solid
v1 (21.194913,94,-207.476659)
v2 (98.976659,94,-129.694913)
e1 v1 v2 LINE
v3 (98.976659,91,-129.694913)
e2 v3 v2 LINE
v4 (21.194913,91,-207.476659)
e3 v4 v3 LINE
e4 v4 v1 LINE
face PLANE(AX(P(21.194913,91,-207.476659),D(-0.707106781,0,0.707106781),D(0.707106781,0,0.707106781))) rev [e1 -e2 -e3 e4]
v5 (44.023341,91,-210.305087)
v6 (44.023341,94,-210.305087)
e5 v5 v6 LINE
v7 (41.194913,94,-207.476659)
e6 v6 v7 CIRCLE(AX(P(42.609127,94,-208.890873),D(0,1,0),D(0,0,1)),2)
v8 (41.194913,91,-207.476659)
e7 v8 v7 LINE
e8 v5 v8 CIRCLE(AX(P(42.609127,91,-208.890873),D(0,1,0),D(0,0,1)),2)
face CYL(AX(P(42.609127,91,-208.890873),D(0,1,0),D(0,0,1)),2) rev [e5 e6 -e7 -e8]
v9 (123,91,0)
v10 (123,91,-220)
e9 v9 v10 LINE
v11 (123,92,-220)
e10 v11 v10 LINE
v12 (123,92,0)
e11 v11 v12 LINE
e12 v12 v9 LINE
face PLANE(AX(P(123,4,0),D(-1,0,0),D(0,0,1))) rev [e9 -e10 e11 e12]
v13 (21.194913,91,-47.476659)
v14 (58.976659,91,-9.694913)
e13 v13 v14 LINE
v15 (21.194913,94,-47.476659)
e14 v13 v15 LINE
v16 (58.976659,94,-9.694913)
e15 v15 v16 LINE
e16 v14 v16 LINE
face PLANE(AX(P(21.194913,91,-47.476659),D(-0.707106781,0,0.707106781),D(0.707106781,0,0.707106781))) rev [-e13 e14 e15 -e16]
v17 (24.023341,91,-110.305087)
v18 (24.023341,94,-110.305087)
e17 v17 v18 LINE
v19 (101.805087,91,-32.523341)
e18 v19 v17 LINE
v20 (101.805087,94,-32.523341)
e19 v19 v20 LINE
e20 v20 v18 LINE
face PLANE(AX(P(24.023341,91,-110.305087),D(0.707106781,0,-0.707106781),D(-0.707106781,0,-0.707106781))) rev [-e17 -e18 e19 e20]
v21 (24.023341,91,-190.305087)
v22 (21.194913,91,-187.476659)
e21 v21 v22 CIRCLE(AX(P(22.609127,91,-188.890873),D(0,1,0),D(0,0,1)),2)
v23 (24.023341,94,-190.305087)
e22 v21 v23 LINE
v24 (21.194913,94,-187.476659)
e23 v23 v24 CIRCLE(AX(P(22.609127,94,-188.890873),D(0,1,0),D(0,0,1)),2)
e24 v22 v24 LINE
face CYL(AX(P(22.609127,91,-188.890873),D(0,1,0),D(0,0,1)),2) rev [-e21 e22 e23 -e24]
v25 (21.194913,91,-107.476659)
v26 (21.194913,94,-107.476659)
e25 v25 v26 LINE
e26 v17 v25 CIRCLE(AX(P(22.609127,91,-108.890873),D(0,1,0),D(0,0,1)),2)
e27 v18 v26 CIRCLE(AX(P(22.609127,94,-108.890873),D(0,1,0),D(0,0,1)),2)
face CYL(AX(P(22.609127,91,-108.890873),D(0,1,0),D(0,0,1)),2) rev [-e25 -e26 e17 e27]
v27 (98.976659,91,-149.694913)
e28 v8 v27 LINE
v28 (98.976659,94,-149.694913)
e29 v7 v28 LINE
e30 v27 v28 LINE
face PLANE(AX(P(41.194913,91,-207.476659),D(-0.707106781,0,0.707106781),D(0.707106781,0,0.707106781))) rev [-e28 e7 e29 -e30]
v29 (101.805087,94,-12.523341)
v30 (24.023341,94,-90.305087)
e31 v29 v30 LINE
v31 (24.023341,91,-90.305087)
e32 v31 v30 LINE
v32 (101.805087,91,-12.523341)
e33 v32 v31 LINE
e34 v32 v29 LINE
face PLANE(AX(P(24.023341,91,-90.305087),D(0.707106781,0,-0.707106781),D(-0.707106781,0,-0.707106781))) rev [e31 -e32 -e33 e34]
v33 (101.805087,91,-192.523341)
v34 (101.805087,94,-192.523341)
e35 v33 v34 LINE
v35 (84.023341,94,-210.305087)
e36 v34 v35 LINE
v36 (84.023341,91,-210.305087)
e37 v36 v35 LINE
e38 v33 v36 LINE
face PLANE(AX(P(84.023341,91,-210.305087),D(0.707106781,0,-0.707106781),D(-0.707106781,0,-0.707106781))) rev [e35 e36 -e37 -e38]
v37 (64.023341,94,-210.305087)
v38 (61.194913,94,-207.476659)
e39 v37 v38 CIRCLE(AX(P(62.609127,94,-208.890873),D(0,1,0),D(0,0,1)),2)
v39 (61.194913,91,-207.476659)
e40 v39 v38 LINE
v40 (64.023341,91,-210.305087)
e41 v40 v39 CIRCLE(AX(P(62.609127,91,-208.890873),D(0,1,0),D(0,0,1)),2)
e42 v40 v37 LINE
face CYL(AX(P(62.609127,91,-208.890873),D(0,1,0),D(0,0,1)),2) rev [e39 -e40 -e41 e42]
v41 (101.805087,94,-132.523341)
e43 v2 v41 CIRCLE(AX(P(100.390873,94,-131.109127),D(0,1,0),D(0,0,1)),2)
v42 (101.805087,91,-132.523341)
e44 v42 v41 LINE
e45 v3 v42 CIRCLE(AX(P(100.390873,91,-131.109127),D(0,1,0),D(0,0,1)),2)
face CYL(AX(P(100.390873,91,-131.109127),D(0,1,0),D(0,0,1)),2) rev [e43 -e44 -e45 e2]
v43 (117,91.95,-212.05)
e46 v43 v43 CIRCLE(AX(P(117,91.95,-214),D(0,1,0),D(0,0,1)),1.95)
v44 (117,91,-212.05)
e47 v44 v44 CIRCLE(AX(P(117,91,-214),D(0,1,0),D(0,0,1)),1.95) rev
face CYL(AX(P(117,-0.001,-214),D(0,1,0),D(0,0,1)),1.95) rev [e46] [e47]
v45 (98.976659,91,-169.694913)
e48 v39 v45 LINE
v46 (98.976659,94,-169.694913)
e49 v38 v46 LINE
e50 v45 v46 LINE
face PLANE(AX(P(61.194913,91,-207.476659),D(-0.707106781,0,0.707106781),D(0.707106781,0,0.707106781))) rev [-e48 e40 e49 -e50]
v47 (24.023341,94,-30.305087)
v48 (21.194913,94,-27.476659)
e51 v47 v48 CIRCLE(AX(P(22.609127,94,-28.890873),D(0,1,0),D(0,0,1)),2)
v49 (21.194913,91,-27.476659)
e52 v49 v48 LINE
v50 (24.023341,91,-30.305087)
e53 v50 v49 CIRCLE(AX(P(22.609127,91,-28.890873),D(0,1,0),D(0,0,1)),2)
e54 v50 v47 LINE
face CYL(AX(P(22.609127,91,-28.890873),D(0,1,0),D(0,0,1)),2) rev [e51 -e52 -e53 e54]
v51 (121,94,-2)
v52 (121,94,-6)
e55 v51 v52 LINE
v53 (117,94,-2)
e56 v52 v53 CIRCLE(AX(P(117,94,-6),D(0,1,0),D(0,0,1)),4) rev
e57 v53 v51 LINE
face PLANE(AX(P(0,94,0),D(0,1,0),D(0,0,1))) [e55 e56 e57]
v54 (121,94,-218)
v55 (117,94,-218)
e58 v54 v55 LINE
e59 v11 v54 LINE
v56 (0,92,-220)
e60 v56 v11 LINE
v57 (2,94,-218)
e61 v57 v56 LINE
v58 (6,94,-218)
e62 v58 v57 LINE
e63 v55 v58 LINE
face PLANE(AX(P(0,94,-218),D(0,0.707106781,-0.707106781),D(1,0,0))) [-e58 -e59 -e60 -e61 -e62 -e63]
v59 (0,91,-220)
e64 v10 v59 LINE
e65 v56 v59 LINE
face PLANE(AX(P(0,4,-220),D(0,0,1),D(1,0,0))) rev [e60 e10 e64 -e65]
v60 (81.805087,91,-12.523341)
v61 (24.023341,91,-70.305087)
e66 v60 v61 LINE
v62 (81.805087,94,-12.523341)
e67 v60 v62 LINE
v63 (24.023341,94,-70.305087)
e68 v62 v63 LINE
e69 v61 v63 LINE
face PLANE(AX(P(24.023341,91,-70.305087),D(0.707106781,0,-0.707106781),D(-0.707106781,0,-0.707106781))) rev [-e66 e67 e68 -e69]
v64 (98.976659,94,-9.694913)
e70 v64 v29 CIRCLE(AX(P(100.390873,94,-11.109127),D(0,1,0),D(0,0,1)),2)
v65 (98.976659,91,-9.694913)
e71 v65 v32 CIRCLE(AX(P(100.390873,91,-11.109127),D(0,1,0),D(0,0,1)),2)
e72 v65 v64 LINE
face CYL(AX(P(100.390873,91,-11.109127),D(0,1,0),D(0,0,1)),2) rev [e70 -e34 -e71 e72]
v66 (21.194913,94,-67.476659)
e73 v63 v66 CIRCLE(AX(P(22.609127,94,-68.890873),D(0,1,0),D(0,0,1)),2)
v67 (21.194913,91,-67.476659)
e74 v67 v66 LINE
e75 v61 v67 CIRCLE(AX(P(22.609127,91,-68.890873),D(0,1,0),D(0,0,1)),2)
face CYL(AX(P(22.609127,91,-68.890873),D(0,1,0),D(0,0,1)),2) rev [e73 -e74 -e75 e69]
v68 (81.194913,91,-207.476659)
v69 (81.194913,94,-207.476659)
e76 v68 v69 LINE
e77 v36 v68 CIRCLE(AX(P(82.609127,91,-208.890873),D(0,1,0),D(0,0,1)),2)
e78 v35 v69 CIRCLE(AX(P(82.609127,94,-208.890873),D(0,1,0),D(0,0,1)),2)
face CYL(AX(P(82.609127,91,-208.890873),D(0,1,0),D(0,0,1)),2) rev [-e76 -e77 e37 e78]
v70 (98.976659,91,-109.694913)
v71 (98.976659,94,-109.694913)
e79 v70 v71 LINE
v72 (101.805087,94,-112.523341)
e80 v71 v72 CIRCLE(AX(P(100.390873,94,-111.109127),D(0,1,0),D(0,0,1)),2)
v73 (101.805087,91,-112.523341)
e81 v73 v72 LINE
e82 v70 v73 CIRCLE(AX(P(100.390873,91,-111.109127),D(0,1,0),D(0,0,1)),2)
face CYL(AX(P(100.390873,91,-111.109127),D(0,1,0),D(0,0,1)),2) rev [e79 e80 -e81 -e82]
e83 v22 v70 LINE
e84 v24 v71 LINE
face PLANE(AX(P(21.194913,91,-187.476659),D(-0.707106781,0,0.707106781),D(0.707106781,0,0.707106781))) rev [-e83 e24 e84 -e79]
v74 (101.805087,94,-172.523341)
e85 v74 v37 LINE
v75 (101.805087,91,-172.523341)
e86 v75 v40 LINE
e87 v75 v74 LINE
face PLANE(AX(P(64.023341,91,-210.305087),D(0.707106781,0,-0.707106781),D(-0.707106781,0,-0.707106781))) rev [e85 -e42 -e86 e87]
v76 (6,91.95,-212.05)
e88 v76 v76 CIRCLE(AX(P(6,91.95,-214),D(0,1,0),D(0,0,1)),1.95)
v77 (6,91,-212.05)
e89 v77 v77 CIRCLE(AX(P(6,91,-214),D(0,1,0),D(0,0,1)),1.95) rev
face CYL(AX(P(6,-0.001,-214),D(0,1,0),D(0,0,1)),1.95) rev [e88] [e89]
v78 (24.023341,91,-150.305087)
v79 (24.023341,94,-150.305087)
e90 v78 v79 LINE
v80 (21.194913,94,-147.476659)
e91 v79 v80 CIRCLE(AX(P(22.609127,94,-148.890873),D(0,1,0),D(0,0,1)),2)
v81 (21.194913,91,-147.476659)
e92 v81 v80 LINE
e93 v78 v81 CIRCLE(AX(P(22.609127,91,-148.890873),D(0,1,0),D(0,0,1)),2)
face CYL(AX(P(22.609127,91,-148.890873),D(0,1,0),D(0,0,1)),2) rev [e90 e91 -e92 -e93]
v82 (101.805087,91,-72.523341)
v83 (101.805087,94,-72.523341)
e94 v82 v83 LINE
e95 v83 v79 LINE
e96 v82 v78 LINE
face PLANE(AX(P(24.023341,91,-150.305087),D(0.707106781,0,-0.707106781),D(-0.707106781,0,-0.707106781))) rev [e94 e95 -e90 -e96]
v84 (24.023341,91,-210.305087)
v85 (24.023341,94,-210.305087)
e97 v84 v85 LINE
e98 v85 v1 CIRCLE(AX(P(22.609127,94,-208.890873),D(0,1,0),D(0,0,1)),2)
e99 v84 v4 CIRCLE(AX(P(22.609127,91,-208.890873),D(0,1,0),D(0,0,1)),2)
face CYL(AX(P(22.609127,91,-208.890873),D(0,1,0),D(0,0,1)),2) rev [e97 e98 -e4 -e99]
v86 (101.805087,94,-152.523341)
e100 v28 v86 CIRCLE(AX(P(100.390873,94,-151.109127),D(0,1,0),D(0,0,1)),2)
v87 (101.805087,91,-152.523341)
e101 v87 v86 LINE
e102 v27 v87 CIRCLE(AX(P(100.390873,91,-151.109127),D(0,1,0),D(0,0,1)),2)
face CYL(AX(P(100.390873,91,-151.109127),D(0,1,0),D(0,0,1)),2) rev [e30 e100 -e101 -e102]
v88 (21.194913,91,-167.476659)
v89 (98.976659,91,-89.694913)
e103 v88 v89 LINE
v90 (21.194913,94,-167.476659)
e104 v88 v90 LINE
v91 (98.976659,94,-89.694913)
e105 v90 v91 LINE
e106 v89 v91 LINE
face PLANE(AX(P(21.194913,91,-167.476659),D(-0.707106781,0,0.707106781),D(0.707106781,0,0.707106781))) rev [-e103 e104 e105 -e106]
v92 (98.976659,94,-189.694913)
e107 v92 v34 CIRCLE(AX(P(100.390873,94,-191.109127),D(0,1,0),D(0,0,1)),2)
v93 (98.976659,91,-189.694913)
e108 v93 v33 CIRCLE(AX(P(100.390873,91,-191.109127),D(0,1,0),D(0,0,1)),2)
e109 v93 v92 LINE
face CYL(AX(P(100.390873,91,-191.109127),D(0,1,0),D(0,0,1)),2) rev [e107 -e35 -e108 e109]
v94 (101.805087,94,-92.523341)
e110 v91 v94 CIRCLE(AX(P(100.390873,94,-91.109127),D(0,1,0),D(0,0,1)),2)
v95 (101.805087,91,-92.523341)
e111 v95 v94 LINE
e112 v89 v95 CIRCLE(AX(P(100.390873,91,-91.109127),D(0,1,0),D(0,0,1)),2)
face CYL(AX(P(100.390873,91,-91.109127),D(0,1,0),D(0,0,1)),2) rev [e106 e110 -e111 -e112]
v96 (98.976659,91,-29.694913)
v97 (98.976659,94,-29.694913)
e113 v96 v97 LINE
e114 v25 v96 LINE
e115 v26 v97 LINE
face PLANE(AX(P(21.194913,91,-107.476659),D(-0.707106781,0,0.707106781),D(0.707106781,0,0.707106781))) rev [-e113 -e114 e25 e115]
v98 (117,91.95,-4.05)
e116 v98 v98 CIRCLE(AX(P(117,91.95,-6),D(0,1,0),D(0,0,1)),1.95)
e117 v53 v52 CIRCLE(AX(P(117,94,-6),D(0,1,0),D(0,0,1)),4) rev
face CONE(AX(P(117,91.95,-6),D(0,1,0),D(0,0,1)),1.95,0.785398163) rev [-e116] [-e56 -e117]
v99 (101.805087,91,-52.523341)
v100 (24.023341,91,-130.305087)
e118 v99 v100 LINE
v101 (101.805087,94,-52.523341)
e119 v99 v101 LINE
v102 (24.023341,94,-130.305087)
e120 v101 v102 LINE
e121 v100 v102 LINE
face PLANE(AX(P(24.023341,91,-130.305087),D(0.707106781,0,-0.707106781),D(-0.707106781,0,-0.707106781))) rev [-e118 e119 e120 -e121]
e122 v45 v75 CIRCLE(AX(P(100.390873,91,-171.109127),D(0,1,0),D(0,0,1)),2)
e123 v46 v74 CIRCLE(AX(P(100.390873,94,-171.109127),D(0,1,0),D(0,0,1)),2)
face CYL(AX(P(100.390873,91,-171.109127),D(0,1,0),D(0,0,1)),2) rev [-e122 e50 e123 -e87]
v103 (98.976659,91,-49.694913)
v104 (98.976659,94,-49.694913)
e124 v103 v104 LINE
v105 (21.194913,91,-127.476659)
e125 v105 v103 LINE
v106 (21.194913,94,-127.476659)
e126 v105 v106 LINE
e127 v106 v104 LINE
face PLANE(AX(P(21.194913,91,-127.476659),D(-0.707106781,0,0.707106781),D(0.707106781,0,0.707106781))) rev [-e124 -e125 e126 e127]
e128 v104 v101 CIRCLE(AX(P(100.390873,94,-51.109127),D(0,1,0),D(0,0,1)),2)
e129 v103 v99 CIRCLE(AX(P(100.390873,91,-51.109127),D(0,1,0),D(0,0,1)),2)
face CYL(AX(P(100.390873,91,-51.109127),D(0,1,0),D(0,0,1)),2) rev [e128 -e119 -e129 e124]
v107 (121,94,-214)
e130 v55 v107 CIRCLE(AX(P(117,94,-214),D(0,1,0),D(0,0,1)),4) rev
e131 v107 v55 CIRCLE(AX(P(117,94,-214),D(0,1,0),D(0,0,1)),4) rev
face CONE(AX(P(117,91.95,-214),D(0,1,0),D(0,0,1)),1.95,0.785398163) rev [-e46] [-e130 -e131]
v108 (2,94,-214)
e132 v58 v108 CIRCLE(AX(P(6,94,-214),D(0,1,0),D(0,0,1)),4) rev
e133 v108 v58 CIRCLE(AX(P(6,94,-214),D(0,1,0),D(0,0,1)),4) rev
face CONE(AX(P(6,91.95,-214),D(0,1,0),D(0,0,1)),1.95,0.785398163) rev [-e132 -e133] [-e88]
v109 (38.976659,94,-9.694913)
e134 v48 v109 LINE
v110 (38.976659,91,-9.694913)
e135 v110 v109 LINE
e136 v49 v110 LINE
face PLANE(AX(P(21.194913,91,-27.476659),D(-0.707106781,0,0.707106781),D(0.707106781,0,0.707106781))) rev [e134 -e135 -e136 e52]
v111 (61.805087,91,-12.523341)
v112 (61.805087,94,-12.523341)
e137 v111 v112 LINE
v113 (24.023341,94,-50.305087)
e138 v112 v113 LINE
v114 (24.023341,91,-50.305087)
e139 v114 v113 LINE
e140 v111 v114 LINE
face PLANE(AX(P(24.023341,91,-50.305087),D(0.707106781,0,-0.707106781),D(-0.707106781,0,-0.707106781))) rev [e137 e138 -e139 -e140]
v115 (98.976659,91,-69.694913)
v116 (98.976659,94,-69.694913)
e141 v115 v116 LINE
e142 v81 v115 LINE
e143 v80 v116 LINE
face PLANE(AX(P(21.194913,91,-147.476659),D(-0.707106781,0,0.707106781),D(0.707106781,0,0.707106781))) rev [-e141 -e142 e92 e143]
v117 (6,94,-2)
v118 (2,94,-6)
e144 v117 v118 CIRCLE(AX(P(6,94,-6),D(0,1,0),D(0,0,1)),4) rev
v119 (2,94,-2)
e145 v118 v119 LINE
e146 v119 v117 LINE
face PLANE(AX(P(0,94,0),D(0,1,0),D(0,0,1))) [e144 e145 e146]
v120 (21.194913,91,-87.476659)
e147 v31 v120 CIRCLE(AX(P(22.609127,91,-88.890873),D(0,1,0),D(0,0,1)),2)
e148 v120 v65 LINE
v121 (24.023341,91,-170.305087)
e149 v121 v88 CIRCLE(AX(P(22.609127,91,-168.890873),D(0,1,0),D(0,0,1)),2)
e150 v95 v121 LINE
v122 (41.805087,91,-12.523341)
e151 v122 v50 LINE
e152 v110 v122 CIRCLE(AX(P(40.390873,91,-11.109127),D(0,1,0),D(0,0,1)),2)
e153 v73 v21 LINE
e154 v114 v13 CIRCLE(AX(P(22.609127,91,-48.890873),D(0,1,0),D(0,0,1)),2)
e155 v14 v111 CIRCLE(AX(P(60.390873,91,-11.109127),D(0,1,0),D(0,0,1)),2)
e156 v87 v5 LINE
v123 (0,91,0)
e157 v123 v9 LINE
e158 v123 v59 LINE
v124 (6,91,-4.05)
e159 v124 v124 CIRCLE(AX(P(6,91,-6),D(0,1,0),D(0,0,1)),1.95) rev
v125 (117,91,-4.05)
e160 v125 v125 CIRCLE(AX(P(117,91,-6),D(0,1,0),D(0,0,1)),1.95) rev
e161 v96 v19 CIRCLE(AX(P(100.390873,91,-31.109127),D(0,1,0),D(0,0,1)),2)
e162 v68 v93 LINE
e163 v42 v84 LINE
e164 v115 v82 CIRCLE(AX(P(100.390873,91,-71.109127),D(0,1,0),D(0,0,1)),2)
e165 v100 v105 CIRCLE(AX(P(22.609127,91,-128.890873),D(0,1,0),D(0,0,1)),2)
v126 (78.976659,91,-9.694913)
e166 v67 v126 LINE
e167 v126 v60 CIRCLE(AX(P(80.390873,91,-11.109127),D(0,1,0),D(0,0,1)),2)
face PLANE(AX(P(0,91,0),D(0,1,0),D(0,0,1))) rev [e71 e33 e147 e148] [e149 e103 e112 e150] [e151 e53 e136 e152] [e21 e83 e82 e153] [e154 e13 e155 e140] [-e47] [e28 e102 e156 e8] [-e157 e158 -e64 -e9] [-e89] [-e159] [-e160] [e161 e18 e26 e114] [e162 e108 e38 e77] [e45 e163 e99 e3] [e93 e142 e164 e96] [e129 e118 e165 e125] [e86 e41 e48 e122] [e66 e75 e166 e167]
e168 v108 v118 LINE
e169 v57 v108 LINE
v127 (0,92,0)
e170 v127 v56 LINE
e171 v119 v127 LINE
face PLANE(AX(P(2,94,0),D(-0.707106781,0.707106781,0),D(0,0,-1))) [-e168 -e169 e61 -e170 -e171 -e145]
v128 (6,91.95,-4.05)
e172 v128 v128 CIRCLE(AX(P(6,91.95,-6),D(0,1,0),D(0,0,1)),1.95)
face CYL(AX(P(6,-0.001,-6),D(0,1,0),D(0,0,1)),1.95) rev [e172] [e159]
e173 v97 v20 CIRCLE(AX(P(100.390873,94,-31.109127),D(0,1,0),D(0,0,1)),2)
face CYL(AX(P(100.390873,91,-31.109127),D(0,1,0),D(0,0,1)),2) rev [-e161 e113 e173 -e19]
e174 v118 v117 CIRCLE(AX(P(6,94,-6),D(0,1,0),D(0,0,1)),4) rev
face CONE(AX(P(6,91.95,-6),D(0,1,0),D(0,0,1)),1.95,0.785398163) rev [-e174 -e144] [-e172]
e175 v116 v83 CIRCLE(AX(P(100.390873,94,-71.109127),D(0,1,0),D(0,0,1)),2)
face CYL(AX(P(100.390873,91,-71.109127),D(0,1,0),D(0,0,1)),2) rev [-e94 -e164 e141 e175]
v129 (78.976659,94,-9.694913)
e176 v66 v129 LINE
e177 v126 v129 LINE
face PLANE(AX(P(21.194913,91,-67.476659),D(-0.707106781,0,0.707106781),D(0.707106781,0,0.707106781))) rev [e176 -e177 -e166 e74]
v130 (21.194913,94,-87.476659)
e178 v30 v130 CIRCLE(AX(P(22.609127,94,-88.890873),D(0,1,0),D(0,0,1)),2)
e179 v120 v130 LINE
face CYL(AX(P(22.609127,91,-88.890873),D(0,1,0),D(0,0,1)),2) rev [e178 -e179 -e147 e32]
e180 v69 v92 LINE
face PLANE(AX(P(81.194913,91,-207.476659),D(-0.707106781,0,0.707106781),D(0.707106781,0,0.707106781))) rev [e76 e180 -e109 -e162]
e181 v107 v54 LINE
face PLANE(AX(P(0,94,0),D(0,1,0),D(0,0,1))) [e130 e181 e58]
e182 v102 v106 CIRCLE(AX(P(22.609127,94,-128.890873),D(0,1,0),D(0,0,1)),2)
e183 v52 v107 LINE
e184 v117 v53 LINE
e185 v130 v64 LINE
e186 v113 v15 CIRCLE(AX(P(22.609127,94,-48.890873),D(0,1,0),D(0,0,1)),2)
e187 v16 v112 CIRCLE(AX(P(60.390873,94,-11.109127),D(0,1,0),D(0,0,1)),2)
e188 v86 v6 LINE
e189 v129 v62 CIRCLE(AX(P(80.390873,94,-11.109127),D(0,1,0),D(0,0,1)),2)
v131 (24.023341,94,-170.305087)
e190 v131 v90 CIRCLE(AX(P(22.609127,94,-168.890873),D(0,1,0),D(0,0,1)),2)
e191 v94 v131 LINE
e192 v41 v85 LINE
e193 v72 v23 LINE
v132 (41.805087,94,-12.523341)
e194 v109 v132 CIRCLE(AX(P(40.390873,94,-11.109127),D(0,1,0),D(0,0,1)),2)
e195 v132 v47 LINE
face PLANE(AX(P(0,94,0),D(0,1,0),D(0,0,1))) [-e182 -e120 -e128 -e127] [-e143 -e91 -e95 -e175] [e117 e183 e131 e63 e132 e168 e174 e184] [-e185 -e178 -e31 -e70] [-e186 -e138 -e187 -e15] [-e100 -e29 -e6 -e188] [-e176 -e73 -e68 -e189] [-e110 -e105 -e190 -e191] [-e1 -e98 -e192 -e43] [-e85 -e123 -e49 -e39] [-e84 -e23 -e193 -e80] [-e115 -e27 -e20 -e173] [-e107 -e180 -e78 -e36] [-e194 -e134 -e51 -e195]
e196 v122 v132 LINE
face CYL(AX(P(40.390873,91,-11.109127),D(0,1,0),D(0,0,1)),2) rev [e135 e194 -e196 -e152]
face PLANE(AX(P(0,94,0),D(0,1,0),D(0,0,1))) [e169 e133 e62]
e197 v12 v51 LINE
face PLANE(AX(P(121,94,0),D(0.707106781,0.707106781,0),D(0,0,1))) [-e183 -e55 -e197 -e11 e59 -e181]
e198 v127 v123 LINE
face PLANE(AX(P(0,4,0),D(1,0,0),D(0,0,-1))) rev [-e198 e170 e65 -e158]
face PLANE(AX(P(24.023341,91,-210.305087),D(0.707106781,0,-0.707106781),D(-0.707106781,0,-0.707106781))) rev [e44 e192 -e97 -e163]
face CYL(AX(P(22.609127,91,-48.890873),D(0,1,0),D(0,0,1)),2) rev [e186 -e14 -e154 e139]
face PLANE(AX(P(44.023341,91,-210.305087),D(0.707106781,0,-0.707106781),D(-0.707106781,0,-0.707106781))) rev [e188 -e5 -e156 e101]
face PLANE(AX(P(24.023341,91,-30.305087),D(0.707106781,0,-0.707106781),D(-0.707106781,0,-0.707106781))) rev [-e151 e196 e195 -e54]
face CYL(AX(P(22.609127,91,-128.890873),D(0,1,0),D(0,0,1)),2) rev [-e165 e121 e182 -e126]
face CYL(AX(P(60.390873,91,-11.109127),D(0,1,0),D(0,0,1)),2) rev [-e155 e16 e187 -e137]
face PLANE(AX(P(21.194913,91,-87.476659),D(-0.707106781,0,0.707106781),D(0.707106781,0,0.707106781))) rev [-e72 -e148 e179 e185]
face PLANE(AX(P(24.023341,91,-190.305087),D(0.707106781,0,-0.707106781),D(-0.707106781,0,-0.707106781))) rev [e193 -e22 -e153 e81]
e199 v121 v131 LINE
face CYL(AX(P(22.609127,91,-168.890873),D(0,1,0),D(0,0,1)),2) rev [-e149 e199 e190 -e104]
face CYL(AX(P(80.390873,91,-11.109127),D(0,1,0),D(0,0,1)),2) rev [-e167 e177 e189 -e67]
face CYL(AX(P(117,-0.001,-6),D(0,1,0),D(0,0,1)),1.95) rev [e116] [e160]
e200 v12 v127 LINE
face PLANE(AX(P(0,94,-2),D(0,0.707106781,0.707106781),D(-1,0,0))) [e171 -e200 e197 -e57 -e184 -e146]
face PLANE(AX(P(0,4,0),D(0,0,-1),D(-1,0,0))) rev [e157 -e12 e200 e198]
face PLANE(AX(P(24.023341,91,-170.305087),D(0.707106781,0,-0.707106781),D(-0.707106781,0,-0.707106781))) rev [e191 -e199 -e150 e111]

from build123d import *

# Parameters (mm, degrees)
SKETCH1_W           = 123
SKETCH1_H           = 220
BOSS_EXTRUDE1_DEPTH = 4
SKETCH2_W           = 123
SKETCH2_H           = 220
SKETCH2_W_2         = 115
SKETCH2_H_2         = 212
BOSS_EXTRUDE2_DEPTH = 87
CUT_EXTRUDE1_REACH  = 269.974
SKETCH3_W           = 115
SKETCH3_H           = 45
CUT_EXTRUDE2_REACH  = 269.974
SKETCH4_W           = 150
SKETCH4_H           = 20
SKETCH6_W           = 24
SKETCH6_H           = 37
SKETCH6_R           = 1.45
BOSS_EXTRUDE4_DEPTH = 3
SKETCH8_W           = 12
SKETCH8_H           = 12
BOSS_EXTRUDE5_DEPTH = 10
CUT_EXTRUDE3_REACH  = 269.974
SKETCH9_R           = 1.95
CUT_EXTRUDE4_REACH  = 269.974
SKETCH10_W          = 99
SKETCH10_H          = 40
CHAMFER1_SIZE       = 10
BOSS_EXTRUDE6_START = 3
SKETCH11_W          = 123
SKETCH11_H          = 220
SKETCH11_R          = 1.95
BOSS_EXTRUDE6_DEPTH = 3
CHAMFER2_SIZE       = 2.05
SKETCH12_W          = 123
SKETCH12_H          = 91
CUT_EXTRUDE5_DEPTH  = 270.007434841
CHAMFER3_SIZE       = 2
CUT_EXTRUDE6_DEPTH  = 253.06745129


with BuildPart() as part:
    # Sketch1 → Boss-Extrude1 (new body)
    with BuildSketch(Plane(origin=(0, 0, 0), x_dir=(1, 0, 0), z_dir=(0, 1, 0))):
        with Locations((61.5, 110)):
            Rectangle(SKETCH1_W, SKETCH1_H)
    extrude(amount=BOSS_EXTRUDE1_DEPTH)

    # Sketch2 → Boss-Extrude2 (add)
    with BuildSketch(Plane(origin=(0, 4, 0), x_dir=(1, 0, 0), z_dir=(0, 1, 0))):
        with Locations((61.5, 110)):
            Rectangle(SKETCH2_W, SKETCH2_H)
        with Locations((61.5, 110)):
            Rectangle(SKETCH2_W_2, SKETCH2_H_2, mode=Mode.SUBTRACT)
    extrude(amount=BOSS_EXTRUDE2_DEPTH)

    # Sketch3 → Cut-Extrude1 (cut, up to next)
    with BuildSketch(Plane.XY, mode=Mode.PRIVATE) as cut_extrude1_sk1:
        with Locations((61.5, 26.5)):
            Rectangle(SKETCH3_W, SKETCH3_H)
    cut_extrude1_tool1 = extrude(cut_extrude1_sk1.sketch, amount=-CUT_EXTRUDE1_REACH, mode=Mode.PRIVATE) & part.part
    add(cut_extrude1_tool1.solids().sort_by_distance((61.5, 26.5, 0))[0], mode=Mode.SUBTRACT)

    # Sketch4 → Cut-Extrude2 (cut, up to next)
    with BuildSketch(Plane(origin=(123, 0, 0), x_dir=(0, 0, -1), z_dir=(1, 0, 0)), mode=Mode.PRIVATE) as cut_extrude2_sk1:
        with Locations((125, 81)):
            Rectangle(SKETCH4_W, SKETCH4_H)
    cut_extrude2_tool1 = extrude(cut_extrude2_sk1.sketch, amount=-CUT_EXTRUDE2_REACH, mode=Mode.PRIVATE) & part.part
    add(cut_extrude2_tool1.solids().sort_by_distance((123, 81, -125))[0], mode=Mode.SUBTRACT)

    # Sketch6 → Boss-Extrude4 (add)
    # profile 1 of 2: a face of its own
    with BuildSketch(Plane(origin=(0, 49, 0), x_dir=(-1, 0, 0), z_dir=(0, -1, 0))):
        with Locations((-16, 22.5)):
            Rectangle(SKETCH6_W, SKETCH6_H)
        with Locations(Location((-25, 27.5, 0), (0, 0, 90))):
            Circle(SKETCH6_R, mode=Mode.SUBTRACT)
        with Locations(Location((-25, 17.5, 0), (0, 0, 270))):
            Circle(SKETCH6_R, mode=Mode.SUBTRACT)
    # profile 2 of 2: a face of its own
    with BuildSketch(Plane(origin=(0, 49, 0), x_dir=(-1, 0, 0), z_dir=(0, -1, 0))):
        with Locations((-107, 22.5)):
            Rectangle(SKETCH6_W, SKETCH6_H)
        with Locations(Location((-98, 17.5, 0), (0, 0, 90))):
            Circle(SKETCH6_R, mode=Mode.SUBTRACT)
        with Locations(Location((-98, 27.5, 0), (0, 0, 270))):
            Circle(SKETCH6_R, mode=Mode.SUBTRACT)
    extrude(amount=-BOSS_EXTRUDE4_DEPTH)

    # Sketch8 → Boss-Extrude5 (add)
    with BuildSketch(Plane(origin=(0, 91, 0), x_dir=(1, 0, 0), z_dir=(0, 1, 0))):
        with Locations((117, 214)):
            Rectangle(SKETCH8_W, SKETCH8_H)
        with Locations((6, 214)):
            Rectangle(SKETCH8_W, SKETCH8_H)
        with Locations((117, 6)):
            Rectangle(SKETCH8_W, SKETCH8_H)
        with Locations((6, 6)):
            Rectangle(SKETCH8_W, SKETCH8_H)
    extrude(amount=-BOSS_EXTRUDE5_DEPTH)

    # Sketch9 → Cut-Extrude3 (cut, up to next)
    with BuildSketch(Plane(origin=(0, 91, 0), x_dir=(1, 0, 0), z_dir=(0, 1, 0)), mode=Mode.PRIVATE) as cut_extrude3_sk1:
        with Locations(Location((6, 214, 0), (0, 0, 270))):
            Circle(SKETCH9_R)
    cut_extrude3_tool1 = extrude(cut_extrude3_sk1.sketch, amount=-CUT_EXTRUDE3_REACH, mode=Mode.PRIVATE) & part.part
    # Sketch9 → Cut-Extrude3 (cut, up to next)
    with BuildSketch(Plane(origin=(0, 91, 0), x_dir=(1, 0, 0), z_dir=(0, 1, 0)), mode=Mode.PRIVATE) as cut_extrude3_sk2:
        with Locations(Location((117, 214, 0), (0, 0, 90))):
            Circle(SKETCH9_R)
    cut_extrude3_tool2 = extrude(cut_extrude3_sk2.sketch, amount=-CUT_EXTRUDE3_REACH, mode=Mode.PRIVATE) & part.part
    # Sketch9 → Cut-Extrude3 (cut, up to next)
    with BuildSketch(Plane(origin=(0, 91, 0), x_dir=(1, 0, 0), z_dir=(0, 1, 0)), mode=Mode.PRIVATE) as cut_extrude3_sk3:
        with Locations(Location((117, 6, 0), (0, 0, 270))):
            Circle(SKETCH9_R)
    cut_extrude3_tool3 = extrude(cut_extrude3_sk3.sketch, amount=-CUT_EXTRUDE3_REACH, mode=Mode.PRIVATE) & part.part
    # Sketch9 → Cut-Extrude3 (cut, up to next)
    with BuildSketch(Plane(origin=(0, 91, 0), x_dir=(1, 0, 0), z_dir=(0, 1, 0)), mode=Mode.PRIVATE) as cut_extrude3_sk4:
        with Locations(Location((6, 6, 0), (0, 0, 90))):
            Circle(SKETCH9_R)
    cut_extrude3_tool4 = extrude(cut_extrude3_sk4.sketch, amount=-CUT_EXTRUDE3_REACH, mode=Mode.PRIVATE) & part.part
    add(cut_extrude3_tool1.solids().sort_by_distance((6, 91, -214))[0], mode=Mode.SUBTRACT)
    add(cut_extrude3_tool2.solids().sort_by_distance((117, 91, -214))[0], mode=Mode.SUBTRACT)
    add(cut_extrude3_tool3.solids().sort_by_distance((117, 91, -6))[0], mode=Mode.SUBTRACT)
    add(cut_extrude3_tool4.solids().sort_by_distance((6, 91, -6))[0], mode=Mode.SUBTRACT)

    # Sketch10 → Cut-Extrude4 (cut, up to next)
    with BuildSketch(Plane(origin=(0, 0, -220), x_dir=(-1, 0, 0), z_dir=(0, 0, -1)), mode=Mode.PRIVATE) as cut_extrude4_sk1:
        with Locations((-61.5, 71)):
            Rectangle(SKETCH10_W, SKETCH10_H)
    cut_extrude4_tool1 = extrude(cut_extrude4_sk1.sketch, amount=-CUT_EXTRUDE4_REACH, mode=Mode.PRIVATE) & part.part
    add(cut_extrude4_tool1.solids().sort_by_distance((61.5, 71, -220))[0], mode=Mode.SUBTRACT)

    # Chamfer1
    chamfer1_edges = [part.edges().sort_by_distance(p)[0] for p in [
        (4, 52, -22.5),
        (119, 52, -22.5),
    ]]
    chamfer(chamfer1_edges, length=CHAMFER1_SIZE)

    # Sketch11 → Boss-Extrude6 (add)
    with BuildSketch(Plane(origin=(0, 91, 0), x_dir=(1, 0, 0), z_dir=(0, 1, 0)).offset(BOSS_EXTRUDE6_START)):
        with Locations((61.5, 110)):
            Rectangle(SKETCH11_W, SKETCH11_H)
        with Locations(Location((6, 214, 0), (0, 0, 270))):
            Circle(SKETCH11_R, mode=Mode.SUBTRACT)
        with Locations(Location((117, 214, 0), (0, 0, 270))):
            Circle(SKETCH11_R, mode=Mode.SUBTRACT)
        with Locations(Location((117, 6, 0), (0, 0, 270))):
            Circle(SKETCH11_R, mode=Mode.SUBTRACT)
        with Locations(Location((6, 6, 0), (0, 0, 270))):
            Circle(SKETCH11_R, mode=Mode.SUBTRACT)
    extrude(amount=-BOSS_EXTRUDE6_DEPTH)

    # Chamfer2
    chamfer2_edges = [part.edges().sort_by_distance(p)[0] for p in [
        (6, 94, -215.95),
        (117, 94, -215.95),
        (117, 94, -7.95),
        (6, 94, -7.95),
    ]]
    chamfer(chamfer2_edges, length=CHAMFER2_SIZE)

    # Sketch12 → Cut-Extrude5 (cut, through all)
    with BuildSketch(Plane(origin=(0, 0, -220), x_dir=(-1, 0, 0), z_dir=(0, 0, -1))):
        with Locations((-61.5, 45.5)):
            Rectangle(SKETCH12_W, SKETCH12_H)
    extrude(amount=-CUT_EXTRUDE5_DEPTH, mode=Mode.SUBTRACT)

    # Chamfer3
    chamfer3_edges = [part.edges().sort_by_distance(p)[0] for p in [
        (0, 94, -110),
        (61.5, 94, 0),
        (123, 94, -110),
        (61.5, 94, -220),
    ]]
    chamfer(chamfer3_edges, length=CHAMFER3_SIZE - 0.0001)  # a hair under: the kernel refuses the full size

    # Sketch13 → Cut-Extrude6 (cut, through all)
    with BuildSketch(Plane(origin=(0, 94, 0), x_dir=(1, 0, 0), z_dir=(0, 1, 0))):
        with BuildLine():
            Line((24.023340597, 150.305086528), (101.805086528, 72.523340597))
            ThreePointArc((101.805086528, 72.523340597), (101.805086528, 69.694913472), (98.976659403, 69.694913472))
            Line((98.976659403, 69.694913472), (21.194913472, 147.476659403))
            ThreePointArc((21.194913472, 147.476659403), (21.194913472, 150.305086528), (24.023340597, 150.305086528))
        make_face()
        with BuildLine():
            Line((24.023340597, 30.305086528), (41.805086528, 12.523340597))
            ThreePointArc((41.805086528, 12.523340597), (41.805086528, 9.694913472), (38.976659403, 9.694913472))
            Line((38.976659403, 9.694913472), (21.194913472, 27.476659403))
            ThreePointArc((21.194913472, 27.476659403), (21.194913472, 30.305086528), (24.023340597, 30.305086528))
        make_face()
        with BuildLine():
            Line((24.023340597, 50.305086528), (61.805086528, 12.523340597))
            ThreePointArc((61.805086528, 12.523340597), (61.805086528, 9.694913472), (58.976659403, 9.694913472))
            Line((58.976659403, 9.694913472), (21.194913472, 47.476659403))
            ThreePointArc((21.194913472, 47.476659403), (21.194913472, 50.305086528), (24.023340597, 50.305086528))
        make_face()
        with BuildLine():
            Line((24.023340597, 70.305086528), (81.805086528, 12.523340597))
            ThreePointArc((81.805086528, 12.523340597), (81.805086528, 9.694913472), (78.976659403, 9.694913472))
            Line((78.976659403, 9.694913472), (21.194913472, 67.476659403))
            ThreePointArc((21.194913472, 67.476659403), (21.194913472, 70.305086528), (24.023340597, 70.305086528))
        make_face()
        with BuildLine():
            Line((24.023340597, 90.305086528), (101.805086528, 12.523340597))
            ThreePointArc((101.805086528, 12.523340597), (101.805086528, 9.694913472), (98.976659403, 9.694913472))
            Line((98.976659403, 9.694913472), (21.194913472, 87.476659403))
            ThreePointArc((21.194913472, 87.476659403), (21.194913472, 90.305086528), (24.023340597, 90.305086528))
        make_face()
        with BuildLine():
            Line((24.023340597, 110.305086528), (101.805086528, 32.523340597))
            ThreePointArc((101.805086528, 32.523340597), (101.805086528, 29.694913472), (98.976659403, 29.694913472))
            Line((98.976659403, 29.694913472), (21.194913472, 107.476659403))
            ThreePointArc((21.194913472, 107.476659403), (21.194913472, 110.305086528), (24.023340597, 110.305086528))
        make_face()
        with BuildLine():
            Line((44.023340597, 210.305086528), (101.805086528, 152.523340597))
            ThreePointArc((101.805086528, 152.523340597), (101.805086528, 149.694913472), (98.976659403, 149.694913472))
            Line((98.976659403, 149.694913472), (41.194913472, 207.476659403))
            ThreePointArc((41.194913472, 207.476659403), (41.194913472, 210.305086528), (44.023340597, 210.305086528))
        make_face()
        with BuildLine():
            Line((24.023340597, 130.305086528), (101.805086528, 52.523340597))
            ThreePointArc((101.805086528, 52.523340597), (101.805086528, 49.694913472), (98.976659403, 49.694913472))
            Line((98.976659403, 49.694913472), (21.194913472, 127.476659403))
            ThreePointArc((21.194913472, 127.476659403), (21.194913472, 130.305086528), (24.023340597, 130.305086528))
        make_face()
        with BuildLine():
            Line((64.023340597, 210.305086528), (101.805086528, 172.523340597))
            ThreePointArc((101.805086528, 172.523340597), (101.805086528, 169.694913472), (98.976659403, 169.694913472))
            Line((98.976659403, 169.694913472), (61.194913472, 207.476659403))
            ThreePointArc((61.194913472, 207.476659403), (61.194913472, 210.305086528), (64.023340597, 210.305086528))
        make_face()
        with BuildLine():
            Line((24.023340597, 210.305086528), (101.805086528, 132.523340597))
            ThreePointArc((101.805086528, 132.523340597), (101.805086528, 129.694913472), (98.976659403, 129.694913472))
            Line((98.976659403, 129.694913472), (21.194913472, 207.476659403))
            ThreePointArc((21.194913472, 207.476659403), (21.194913472, 210.305086528), (24.023340597, 210.305086528))
        make_face()
        with BuildLine():
            Line((24.023340597, 190.305086528), (101.805086528, 112.523340597))
            ThreePointArc((101.805086528, 112.523340597), (101.805086528, 109.694913472), (98.976659403, 109.694913472))
            Line((98.976659403, 109.694913472), (21.194913472, 187.476659403))
            ThreePointArc((21.194913472, 187.476659403), (21.194913472, 190.305086528), (24.023340597, 190.305086528))
        make_face()
        with BuildLine():
            Line((24.023340597, 170.305086528), (101.805086528, 92.523340597))
            ThreePointArc((101.805086528, 92.523340597), (101.805086528, 89.694913472), (98.976659403, 89.694913472))
            Line((98.976659403, 89.694913472), (21.194913472, 167.476659403))
            ThreePointArc((21.194913472, 167.476659403), (21.194913472, 170.305086528), (24.023340597, 170.305086528))
        make_face()
        with BuildLine():
            Line((84.023340597, 210.305086528), (101.805086528, 192.523340597))
            ThreePointArc((101.805086528, 192.523340597), (101.805086528, 189.694913472), (98.976659403, 189.694913472))
            Line((98.976659403, 189.694913472), (81.194913472, 207.476659403))
            ThreePointArc((81.194913472, 207.476659403), (81.194913472, 210.305086528), (84.023340597, 210.305086528))
        make_face()
    extrude(amount=-CUT_EXTRUDE6_DEPTH, mode=Mode.SUBTRACT)


solid = part.part
